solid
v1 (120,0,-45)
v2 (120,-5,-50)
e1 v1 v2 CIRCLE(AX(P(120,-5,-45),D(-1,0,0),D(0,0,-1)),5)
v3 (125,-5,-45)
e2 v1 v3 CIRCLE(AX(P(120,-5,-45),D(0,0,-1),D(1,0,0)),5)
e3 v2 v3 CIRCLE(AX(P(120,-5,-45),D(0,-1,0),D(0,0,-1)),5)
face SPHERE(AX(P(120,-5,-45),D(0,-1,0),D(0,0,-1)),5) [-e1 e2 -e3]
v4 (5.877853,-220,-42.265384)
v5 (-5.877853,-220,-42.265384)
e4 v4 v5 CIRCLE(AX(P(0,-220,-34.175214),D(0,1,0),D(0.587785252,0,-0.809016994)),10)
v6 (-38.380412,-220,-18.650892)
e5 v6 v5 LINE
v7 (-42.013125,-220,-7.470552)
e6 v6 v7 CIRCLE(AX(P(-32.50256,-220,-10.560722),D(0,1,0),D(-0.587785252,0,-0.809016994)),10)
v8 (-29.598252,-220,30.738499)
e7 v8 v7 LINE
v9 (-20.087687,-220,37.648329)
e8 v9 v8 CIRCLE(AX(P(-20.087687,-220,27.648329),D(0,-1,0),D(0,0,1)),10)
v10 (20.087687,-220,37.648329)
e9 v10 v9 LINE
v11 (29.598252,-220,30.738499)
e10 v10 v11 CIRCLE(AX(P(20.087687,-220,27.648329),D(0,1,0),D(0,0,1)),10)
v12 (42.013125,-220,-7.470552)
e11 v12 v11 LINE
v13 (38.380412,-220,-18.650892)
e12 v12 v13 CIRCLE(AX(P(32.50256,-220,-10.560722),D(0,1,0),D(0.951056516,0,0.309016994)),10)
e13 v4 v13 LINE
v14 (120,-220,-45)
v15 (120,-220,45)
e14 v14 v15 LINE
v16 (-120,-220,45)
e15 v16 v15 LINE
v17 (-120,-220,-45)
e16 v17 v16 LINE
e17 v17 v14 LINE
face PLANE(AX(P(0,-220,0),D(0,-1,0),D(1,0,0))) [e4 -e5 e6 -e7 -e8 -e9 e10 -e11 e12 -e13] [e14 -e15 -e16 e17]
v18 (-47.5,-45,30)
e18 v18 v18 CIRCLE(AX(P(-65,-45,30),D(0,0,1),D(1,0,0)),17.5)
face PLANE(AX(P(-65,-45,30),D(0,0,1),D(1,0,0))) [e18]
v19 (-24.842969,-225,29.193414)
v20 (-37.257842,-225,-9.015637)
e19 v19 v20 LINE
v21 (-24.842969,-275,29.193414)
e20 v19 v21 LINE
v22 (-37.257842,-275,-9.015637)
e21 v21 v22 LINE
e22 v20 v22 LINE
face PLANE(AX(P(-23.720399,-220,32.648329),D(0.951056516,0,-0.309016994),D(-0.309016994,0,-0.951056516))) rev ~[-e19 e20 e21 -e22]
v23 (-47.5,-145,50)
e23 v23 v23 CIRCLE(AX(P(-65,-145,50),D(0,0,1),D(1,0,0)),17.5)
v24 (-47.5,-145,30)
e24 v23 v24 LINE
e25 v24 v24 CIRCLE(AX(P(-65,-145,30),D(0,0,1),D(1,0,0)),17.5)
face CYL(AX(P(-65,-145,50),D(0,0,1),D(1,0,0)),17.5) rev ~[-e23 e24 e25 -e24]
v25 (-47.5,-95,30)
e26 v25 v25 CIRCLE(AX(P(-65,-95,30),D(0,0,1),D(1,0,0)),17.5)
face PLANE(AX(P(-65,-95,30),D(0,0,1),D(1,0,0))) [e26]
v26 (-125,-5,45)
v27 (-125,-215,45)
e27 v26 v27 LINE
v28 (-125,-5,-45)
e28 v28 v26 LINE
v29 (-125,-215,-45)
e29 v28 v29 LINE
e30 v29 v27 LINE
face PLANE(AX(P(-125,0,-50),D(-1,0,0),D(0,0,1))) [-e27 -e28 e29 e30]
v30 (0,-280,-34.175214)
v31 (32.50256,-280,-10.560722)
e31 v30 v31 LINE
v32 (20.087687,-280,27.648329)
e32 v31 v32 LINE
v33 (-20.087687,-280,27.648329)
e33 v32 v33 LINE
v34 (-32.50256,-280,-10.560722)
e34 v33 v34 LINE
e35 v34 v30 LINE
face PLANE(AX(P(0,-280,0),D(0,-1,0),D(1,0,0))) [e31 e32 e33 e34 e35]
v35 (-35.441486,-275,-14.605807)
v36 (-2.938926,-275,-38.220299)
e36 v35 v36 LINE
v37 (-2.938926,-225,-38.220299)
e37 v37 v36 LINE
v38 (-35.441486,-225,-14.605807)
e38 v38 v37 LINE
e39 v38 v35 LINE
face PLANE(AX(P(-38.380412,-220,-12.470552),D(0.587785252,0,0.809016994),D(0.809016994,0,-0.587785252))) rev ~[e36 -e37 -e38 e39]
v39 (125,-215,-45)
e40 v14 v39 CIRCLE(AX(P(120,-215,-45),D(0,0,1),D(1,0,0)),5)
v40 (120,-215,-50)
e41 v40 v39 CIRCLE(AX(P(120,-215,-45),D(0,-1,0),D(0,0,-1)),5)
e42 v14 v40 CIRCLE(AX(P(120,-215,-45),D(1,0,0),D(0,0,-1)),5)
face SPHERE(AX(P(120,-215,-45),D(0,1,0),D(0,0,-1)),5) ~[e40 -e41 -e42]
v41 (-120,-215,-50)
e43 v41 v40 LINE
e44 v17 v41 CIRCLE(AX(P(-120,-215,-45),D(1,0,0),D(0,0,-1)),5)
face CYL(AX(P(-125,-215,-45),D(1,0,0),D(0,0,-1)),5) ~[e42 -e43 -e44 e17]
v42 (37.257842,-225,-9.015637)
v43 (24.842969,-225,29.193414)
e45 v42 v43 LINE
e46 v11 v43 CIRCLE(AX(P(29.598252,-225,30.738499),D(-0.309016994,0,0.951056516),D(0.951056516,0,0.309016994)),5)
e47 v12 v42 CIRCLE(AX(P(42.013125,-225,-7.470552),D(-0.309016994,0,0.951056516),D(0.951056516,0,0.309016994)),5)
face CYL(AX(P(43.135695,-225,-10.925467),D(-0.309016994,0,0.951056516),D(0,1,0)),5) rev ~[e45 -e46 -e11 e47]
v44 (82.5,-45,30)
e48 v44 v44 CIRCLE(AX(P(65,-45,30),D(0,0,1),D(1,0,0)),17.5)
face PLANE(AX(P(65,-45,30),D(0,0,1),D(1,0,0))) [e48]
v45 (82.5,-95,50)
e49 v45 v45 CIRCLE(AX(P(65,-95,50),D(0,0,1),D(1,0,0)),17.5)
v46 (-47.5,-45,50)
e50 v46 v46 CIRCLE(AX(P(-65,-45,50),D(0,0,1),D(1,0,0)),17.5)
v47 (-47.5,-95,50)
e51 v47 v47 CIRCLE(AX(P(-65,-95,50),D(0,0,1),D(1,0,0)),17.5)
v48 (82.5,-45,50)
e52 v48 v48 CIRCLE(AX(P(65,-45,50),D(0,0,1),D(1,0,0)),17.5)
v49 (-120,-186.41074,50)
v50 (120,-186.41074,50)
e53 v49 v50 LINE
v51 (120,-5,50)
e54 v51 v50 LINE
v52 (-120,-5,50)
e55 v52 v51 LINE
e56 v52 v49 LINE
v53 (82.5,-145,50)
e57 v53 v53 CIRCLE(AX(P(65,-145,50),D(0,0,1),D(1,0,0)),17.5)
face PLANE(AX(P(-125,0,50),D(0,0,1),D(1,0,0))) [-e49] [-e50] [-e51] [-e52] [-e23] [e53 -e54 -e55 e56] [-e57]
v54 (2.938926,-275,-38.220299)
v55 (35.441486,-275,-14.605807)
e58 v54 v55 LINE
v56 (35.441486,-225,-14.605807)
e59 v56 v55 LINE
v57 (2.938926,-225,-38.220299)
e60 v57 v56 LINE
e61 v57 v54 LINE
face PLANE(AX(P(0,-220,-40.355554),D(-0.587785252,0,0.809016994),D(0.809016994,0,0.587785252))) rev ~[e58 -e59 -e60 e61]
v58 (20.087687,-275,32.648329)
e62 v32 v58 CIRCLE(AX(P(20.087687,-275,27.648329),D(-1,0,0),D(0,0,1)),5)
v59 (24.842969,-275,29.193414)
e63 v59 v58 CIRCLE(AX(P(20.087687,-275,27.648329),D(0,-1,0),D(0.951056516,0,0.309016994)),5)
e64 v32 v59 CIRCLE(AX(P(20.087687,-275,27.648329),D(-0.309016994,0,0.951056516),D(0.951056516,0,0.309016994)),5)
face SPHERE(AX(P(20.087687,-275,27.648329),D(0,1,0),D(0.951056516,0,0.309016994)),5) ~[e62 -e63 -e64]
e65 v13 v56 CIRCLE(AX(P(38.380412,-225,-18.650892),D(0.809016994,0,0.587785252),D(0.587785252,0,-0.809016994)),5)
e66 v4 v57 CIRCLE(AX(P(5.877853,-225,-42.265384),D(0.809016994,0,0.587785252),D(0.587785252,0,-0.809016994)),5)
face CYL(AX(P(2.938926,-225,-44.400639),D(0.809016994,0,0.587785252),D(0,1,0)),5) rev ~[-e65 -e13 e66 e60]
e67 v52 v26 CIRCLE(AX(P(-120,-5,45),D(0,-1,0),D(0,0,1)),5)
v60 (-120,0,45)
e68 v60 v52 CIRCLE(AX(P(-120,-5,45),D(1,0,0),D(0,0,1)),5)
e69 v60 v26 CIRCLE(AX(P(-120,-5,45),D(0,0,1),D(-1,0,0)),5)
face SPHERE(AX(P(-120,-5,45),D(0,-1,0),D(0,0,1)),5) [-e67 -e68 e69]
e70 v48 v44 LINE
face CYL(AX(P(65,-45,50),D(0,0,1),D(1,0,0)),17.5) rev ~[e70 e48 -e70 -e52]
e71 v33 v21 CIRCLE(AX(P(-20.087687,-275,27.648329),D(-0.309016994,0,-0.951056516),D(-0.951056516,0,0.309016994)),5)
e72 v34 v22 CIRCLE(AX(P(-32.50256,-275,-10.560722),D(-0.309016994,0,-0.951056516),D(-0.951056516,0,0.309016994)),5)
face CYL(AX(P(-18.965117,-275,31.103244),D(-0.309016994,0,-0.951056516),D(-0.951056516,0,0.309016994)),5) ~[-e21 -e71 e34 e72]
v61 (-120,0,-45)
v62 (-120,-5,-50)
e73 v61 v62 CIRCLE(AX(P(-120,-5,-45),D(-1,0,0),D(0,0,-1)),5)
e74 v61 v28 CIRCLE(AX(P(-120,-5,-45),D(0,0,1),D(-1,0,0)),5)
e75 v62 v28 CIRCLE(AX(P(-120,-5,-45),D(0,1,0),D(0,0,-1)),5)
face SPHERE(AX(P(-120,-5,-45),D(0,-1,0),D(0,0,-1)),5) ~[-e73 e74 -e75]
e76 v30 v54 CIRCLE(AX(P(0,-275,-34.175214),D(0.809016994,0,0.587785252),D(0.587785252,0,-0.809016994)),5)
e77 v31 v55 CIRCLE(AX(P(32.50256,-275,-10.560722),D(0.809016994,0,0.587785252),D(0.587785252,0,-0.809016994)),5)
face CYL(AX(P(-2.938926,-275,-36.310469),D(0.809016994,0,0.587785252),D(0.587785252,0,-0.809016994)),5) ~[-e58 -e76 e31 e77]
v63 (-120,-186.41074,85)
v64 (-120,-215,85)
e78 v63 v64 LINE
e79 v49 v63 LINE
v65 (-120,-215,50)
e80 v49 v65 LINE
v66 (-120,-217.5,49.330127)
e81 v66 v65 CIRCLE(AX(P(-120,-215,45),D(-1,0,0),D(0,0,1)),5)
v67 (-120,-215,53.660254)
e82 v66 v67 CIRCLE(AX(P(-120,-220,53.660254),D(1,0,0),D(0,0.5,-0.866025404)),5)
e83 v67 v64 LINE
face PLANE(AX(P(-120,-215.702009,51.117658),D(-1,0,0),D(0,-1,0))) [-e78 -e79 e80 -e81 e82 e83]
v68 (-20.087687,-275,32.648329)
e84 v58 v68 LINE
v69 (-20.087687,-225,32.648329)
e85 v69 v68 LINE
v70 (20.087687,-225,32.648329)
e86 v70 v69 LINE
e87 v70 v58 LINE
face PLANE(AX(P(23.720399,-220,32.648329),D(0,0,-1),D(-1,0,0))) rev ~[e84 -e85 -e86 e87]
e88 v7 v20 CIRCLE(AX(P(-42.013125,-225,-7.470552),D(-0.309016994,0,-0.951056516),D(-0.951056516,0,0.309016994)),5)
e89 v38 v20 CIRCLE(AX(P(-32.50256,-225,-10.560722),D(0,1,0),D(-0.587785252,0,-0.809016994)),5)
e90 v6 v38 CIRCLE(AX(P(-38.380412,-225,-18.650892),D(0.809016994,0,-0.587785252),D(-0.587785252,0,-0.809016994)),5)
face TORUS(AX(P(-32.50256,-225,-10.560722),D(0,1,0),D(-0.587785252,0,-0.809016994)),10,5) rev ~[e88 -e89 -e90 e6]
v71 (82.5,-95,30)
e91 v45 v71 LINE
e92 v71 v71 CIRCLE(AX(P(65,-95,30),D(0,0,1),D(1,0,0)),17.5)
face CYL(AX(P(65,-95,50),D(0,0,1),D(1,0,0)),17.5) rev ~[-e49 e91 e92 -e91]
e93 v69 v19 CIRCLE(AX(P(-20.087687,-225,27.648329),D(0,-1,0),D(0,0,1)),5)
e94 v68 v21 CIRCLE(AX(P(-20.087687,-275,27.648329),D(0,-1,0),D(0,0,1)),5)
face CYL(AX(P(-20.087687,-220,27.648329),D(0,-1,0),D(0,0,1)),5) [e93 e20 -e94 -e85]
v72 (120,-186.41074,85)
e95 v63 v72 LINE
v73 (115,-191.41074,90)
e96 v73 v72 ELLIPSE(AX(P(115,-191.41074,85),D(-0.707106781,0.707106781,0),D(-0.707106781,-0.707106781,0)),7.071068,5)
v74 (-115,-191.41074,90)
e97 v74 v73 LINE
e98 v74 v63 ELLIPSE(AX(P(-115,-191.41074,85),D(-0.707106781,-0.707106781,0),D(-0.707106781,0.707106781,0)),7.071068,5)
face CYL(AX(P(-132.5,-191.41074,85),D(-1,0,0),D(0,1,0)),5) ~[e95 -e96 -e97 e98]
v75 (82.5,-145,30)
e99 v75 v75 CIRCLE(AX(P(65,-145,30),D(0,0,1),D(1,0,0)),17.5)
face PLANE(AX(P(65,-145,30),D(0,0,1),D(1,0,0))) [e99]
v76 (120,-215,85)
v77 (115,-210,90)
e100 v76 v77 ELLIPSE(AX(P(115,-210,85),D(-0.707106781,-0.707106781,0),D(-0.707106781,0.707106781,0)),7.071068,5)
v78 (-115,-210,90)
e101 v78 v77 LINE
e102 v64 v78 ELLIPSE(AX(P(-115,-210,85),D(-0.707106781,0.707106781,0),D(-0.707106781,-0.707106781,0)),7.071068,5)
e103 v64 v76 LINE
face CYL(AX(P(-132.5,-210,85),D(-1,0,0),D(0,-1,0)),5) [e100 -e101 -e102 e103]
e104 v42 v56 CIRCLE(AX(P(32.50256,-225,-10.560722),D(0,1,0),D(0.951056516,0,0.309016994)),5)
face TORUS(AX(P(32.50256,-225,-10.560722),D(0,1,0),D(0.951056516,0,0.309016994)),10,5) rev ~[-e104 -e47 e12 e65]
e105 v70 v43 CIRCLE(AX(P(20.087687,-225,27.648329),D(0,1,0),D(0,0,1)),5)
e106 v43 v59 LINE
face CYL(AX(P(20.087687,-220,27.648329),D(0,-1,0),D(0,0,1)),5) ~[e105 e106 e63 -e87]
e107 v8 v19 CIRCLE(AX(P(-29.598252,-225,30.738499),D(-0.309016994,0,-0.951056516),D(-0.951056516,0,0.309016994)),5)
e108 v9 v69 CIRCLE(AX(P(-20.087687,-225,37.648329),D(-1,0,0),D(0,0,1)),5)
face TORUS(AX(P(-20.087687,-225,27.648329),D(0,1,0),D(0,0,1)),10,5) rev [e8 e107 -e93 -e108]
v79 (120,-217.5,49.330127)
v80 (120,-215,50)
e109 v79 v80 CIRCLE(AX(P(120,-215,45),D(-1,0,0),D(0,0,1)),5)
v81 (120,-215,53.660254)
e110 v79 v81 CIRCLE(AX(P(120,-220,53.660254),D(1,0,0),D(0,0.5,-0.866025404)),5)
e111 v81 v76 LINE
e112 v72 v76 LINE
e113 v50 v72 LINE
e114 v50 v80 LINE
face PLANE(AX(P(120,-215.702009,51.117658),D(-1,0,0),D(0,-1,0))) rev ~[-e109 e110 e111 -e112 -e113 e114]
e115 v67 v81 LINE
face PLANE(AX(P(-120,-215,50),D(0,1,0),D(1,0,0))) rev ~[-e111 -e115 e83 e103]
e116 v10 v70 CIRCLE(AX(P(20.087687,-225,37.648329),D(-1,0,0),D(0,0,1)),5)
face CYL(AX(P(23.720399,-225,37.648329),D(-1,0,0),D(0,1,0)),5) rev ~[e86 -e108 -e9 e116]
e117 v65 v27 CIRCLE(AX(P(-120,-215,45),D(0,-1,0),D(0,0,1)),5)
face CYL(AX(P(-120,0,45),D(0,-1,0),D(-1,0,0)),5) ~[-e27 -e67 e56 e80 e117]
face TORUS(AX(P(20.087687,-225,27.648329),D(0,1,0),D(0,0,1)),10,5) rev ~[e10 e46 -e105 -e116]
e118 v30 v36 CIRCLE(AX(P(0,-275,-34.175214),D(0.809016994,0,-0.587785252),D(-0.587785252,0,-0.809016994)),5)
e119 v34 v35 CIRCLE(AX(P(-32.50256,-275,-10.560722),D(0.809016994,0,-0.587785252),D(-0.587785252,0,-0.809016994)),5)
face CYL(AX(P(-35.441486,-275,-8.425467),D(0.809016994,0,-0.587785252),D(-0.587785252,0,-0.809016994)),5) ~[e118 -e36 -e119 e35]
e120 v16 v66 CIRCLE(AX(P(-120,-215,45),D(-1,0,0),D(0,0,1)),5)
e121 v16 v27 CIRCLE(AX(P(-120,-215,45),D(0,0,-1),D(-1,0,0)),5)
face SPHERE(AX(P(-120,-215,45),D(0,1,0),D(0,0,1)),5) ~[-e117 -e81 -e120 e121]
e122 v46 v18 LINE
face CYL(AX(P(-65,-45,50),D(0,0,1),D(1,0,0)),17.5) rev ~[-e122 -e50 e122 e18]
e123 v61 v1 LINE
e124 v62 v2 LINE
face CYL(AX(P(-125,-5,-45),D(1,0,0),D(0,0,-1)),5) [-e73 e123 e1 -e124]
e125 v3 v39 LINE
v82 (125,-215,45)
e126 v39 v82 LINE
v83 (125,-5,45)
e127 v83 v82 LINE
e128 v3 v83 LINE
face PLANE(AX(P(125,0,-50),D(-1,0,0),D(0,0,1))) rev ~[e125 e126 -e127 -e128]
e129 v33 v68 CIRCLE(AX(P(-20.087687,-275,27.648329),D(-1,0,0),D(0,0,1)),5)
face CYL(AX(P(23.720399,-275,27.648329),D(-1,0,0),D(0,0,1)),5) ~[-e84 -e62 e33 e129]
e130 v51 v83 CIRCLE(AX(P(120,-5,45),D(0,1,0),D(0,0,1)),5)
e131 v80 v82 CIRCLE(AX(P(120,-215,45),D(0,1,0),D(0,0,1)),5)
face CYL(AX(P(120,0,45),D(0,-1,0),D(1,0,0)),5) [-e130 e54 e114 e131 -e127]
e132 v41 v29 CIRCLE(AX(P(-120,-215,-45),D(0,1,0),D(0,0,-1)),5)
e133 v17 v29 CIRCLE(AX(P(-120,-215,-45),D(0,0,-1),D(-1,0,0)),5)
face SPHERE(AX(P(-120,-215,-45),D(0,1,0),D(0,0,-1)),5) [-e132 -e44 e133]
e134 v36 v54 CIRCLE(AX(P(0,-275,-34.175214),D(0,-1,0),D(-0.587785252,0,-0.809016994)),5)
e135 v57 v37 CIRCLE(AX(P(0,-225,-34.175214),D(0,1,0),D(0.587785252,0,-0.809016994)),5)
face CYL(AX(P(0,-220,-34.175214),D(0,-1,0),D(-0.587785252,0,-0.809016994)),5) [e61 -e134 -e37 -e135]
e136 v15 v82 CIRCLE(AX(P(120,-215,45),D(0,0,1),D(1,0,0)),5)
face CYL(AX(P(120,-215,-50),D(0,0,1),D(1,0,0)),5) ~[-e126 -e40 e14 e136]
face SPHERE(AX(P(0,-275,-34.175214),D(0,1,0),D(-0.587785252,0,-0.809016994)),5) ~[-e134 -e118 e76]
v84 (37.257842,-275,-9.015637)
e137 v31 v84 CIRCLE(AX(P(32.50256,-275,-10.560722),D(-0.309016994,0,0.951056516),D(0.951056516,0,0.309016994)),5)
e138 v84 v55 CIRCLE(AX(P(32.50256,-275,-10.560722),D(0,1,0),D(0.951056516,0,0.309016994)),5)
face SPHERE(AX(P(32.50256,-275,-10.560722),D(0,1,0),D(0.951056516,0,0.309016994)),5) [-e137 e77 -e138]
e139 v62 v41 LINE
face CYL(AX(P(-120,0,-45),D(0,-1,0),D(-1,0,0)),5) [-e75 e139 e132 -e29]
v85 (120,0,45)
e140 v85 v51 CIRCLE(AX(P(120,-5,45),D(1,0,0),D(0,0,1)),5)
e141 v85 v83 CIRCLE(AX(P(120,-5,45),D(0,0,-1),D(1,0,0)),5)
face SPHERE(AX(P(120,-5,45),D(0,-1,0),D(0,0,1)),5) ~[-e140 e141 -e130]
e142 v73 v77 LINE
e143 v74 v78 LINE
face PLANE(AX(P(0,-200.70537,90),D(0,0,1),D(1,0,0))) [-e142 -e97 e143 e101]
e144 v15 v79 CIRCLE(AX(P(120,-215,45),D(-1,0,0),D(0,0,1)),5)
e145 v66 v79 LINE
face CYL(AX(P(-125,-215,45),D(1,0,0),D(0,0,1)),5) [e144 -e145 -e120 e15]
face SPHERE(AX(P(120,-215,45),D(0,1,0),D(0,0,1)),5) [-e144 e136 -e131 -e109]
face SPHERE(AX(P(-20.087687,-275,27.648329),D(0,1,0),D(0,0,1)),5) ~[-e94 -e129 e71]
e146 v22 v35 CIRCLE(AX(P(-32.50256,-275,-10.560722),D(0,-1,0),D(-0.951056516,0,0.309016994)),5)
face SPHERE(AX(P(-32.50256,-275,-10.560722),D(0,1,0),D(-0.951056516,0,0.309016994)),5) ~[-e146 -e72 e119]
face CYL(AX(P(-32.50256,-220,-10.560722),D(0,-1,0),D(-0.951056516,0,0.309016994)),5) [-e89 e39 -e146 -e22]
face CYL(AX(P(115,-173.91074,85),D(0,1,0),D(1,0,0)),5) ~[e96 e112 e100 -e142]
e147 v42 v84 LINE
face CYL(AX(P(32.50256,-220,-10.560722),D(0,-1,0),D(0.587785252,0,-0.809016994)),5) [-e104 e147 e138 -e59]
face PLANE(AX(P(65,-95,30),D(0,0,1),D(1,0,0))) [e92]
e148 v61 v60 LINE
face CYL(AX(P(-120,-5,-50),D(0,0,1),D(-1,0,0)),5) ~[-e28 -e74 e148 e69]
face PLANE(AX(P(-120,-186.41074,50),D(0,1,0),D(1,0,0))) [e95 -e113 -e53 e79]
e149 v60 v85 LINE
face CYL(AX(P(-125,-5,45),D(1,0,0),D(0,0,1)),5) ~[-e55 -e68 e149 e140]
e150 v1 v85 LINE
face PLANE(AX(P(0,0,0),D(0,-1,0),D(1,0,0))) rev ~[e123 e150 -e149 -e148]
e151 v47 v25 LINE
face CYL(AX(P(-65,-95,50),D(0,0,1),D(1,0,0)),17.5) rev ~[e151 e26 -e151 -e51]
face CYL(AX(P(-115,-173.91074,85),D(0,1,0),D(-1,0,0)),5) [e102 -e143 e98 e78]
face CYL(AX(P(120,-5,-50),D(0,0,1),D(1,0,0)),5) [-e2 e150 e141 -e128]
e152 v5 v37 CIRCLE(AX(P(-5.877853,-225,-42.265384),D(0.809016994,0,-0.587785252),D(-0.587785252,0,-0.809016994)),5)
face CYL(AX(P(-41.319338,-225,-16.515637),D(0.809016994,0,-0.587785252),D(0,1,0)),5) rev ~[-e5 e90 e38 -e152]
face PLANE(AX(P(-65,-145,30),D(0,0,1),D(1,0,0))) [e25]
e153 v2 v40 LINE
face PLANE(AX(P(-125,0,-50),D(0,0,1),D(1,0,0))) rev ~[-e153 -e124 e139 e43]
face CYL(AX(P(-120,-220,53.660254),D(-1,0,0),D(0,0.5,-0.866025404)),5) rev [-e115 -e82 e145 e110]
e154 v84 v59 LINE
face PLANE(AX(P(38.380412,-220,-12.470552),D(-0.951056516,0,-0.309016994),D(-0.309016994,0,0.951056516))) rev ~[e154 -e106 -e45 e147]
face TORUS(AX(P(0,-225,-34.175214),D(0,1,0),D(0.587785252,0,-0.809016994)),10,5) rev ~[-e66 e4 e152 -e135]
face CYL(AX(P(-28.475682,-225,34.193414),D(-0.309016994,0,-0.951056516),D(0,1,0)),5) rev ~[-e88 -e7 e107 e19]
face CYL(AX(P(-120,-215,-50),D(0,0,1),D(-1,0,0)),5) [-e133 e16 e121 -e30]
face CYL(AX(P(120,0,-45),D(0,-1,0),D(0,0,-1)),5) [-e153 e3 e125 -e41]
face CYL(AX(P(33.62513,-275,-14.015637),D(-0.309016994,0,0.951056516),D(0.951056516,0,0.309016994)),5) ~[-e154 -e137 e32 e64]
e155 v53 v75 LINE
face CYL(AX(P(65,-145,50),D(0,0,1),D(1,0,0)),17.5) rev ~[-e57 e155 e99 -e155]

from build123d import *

# Parameters (mm, degrees)
F0_W        = 250
F0_H        = 100
F1_DEPTH    = 220
F2_R        = 5
F4_DEPTH    = 60
F5_W        = 240
F5_H        = 28.5892599821
F6_DEPTH    = 40
F7_T1_DEPTH = 240
F7_T3_DEPTH = 265
F7_T5_DEPTH = 53.5892599821
F8_R        = 5
F9_R        = 17.5
F10_DEPTH   = 20


# Not quite as in the source:
# - a fillet or chamfer that OpenCascade refuses, or shapes differently, is made with other operations: its cross-section is extruded or revolved along the edge and cut away or added


with BuildPart() as f1:
    # F0 (on Front) → F1 (new body)
    with BuildSketch(Plane.XZ):
        Rectangle(F0_W, F0_H)
    extrude(amount=F1_DEPTH)

    # F2
    f2_edges = [f1.edges().sort_by_distance(p)[0] for p in [
        (125, -110, 50),
        (-125, -110, 50),
        (0, 0, 50),
        (0, -220, 50),
        (-125, -110, -50),
        (125, -110, -50),
        (0, 0, -50),
        (0, -220, -50),
        (125, -220, 0),
        (-125, -220, 0),
        (-125, 0, 0),
        (125, 0, 0),
    ]]
    fillet(f2_edges, radius=F2_R)

    # F3 (on face) → F4 (join)
    with BuildSketch(Plane.XZ.offset(220)):
        Polygon((23.7203992628, 32.6483286917), (-23.7203992628, 32.6483286917), (-38.380412234, -12.4705518844), (0, -40.3555536147), (38.380412234, -12.4705518844), align=None)
    extrude(amount=F4_DEPTH)

    # F5 (on face) → F6 (join)
    with BuildSketch(Plane.XY.offset(50)):
        with Locations((0, -200.7053700089)):
            Rectangle(F5_W, F5_H)
    extrude(amount=F6_DEPTH)

    # F7: fillet of radius 5 on 6 edges, made by hand

    # F7_s2 → F7_t1 (join)
    with BuildSketch(Plane.YZ.offset(-120)):
        with BuildLine():
            ThreePointArc((-217.5, 49.3301270189), (-215.6698729811, 51.1602540378), (-215, 53.6602540378))
            Line((-215, 53.6602540378), (-215, 50))
            ThreePointArc((-215, 50), (-216.2940952255, 49.8296291314), (-217.5, 49.3301270189))
        make_face()
    extrude(amount=F7_T1_DEPTH)

    # F7_s4 → F7_t3 (cut)
    with BuildSketch(Plane.YZ.offset(-132.5)):
        with BuildLine():
            ThreePointArc((-186.4107400179, 85), (-187.875206112, 88.5355339059), (-191.4107400179, 90))
            Line((-191.4107400179, 90), (-186.4107400179, 90))
            Line((-186.4107400179, 90), (-186.4107400179, 85))
        make_face()
        with BuildLine():
            ThreePointArc((-215, 85), (-213.5355339059, 88.5355339059), (-210, 90))
            Line((-210, 90), (-215, 90))
            Line((-215, 90), (-215, 85))
        make_face()
    extrude(amount=F7_T3_DEPTH, mode=Mode.SUBTRACT)

    # F7_s6 → F7_t5 (cut)
    with BuildSketch(Plane.XZ.offset(173.9107400179)):
        with BuildLine():
            ThreePointArc((-120, 85), (-118.5355339059, 88.5355339059), (-115, 90))
            Line((-115, 90), (-120, 90))
            Line((-120, 90), (-120, 85))
        make_face()
        with BuildLine():
            ThreePointArc((120, 85), (118.5355339059, 88.5355339059), (115, 90))
            Line((115, 90), (120, 90))
            Line((120, 90), (120, 85))
        make_face()
    extrude(amount=F7_T5_DEPTH, mode=Mode.SUBTRACT)

    # F8
    f8_edges = [f1.edges().sort_by_distance(p)[0] for p in [
        (0, -220, 32.648329),
        (31.050406, -220, 10.088888),
        (19.190206, -220, -26.413053),
        (-19.190206, -220, -26.413053),
        (-31.050406, -220, 10.088888),
        (31.050406, -280, 10.088888),
        (0, -280, 32.648329),
        (-31.050406, -280, 10.088888),
        (-19.190206, -280, -26.413053),
        (19.190206, -280, -26.413053),
        (-23.720399, -250, 32.648329),
        (23.720399, -250, 32.648329),
        (38.380412, -250, -12.470552),
        (0, -250, -40.355554),
        (-38.380412, -250, -12.470552),
    ]]
    fillet(f8_edges, radius=F8_R)

    # F9 (on face) → F10 (cut)
    with BuildSketch(Plane.XY.offset(50)):
        with Locations((-65, -45)):
            Circle(F9_R)
        with Locations((-65, -95)):
            Circle(F9_R)
        with Locations((-65, -145)):
            Circle(F9_R)
        with Locations((65, -145)):
            Circle(F9_R)
        with Locations((65, -95)):
            Circle(F9_R)
        with Locations((65, -45)):
            Circle(F9_R)
    extrude(amount=-F10_DEPTH, mode=Mode.SUBTRACT)


solid = f1.part
